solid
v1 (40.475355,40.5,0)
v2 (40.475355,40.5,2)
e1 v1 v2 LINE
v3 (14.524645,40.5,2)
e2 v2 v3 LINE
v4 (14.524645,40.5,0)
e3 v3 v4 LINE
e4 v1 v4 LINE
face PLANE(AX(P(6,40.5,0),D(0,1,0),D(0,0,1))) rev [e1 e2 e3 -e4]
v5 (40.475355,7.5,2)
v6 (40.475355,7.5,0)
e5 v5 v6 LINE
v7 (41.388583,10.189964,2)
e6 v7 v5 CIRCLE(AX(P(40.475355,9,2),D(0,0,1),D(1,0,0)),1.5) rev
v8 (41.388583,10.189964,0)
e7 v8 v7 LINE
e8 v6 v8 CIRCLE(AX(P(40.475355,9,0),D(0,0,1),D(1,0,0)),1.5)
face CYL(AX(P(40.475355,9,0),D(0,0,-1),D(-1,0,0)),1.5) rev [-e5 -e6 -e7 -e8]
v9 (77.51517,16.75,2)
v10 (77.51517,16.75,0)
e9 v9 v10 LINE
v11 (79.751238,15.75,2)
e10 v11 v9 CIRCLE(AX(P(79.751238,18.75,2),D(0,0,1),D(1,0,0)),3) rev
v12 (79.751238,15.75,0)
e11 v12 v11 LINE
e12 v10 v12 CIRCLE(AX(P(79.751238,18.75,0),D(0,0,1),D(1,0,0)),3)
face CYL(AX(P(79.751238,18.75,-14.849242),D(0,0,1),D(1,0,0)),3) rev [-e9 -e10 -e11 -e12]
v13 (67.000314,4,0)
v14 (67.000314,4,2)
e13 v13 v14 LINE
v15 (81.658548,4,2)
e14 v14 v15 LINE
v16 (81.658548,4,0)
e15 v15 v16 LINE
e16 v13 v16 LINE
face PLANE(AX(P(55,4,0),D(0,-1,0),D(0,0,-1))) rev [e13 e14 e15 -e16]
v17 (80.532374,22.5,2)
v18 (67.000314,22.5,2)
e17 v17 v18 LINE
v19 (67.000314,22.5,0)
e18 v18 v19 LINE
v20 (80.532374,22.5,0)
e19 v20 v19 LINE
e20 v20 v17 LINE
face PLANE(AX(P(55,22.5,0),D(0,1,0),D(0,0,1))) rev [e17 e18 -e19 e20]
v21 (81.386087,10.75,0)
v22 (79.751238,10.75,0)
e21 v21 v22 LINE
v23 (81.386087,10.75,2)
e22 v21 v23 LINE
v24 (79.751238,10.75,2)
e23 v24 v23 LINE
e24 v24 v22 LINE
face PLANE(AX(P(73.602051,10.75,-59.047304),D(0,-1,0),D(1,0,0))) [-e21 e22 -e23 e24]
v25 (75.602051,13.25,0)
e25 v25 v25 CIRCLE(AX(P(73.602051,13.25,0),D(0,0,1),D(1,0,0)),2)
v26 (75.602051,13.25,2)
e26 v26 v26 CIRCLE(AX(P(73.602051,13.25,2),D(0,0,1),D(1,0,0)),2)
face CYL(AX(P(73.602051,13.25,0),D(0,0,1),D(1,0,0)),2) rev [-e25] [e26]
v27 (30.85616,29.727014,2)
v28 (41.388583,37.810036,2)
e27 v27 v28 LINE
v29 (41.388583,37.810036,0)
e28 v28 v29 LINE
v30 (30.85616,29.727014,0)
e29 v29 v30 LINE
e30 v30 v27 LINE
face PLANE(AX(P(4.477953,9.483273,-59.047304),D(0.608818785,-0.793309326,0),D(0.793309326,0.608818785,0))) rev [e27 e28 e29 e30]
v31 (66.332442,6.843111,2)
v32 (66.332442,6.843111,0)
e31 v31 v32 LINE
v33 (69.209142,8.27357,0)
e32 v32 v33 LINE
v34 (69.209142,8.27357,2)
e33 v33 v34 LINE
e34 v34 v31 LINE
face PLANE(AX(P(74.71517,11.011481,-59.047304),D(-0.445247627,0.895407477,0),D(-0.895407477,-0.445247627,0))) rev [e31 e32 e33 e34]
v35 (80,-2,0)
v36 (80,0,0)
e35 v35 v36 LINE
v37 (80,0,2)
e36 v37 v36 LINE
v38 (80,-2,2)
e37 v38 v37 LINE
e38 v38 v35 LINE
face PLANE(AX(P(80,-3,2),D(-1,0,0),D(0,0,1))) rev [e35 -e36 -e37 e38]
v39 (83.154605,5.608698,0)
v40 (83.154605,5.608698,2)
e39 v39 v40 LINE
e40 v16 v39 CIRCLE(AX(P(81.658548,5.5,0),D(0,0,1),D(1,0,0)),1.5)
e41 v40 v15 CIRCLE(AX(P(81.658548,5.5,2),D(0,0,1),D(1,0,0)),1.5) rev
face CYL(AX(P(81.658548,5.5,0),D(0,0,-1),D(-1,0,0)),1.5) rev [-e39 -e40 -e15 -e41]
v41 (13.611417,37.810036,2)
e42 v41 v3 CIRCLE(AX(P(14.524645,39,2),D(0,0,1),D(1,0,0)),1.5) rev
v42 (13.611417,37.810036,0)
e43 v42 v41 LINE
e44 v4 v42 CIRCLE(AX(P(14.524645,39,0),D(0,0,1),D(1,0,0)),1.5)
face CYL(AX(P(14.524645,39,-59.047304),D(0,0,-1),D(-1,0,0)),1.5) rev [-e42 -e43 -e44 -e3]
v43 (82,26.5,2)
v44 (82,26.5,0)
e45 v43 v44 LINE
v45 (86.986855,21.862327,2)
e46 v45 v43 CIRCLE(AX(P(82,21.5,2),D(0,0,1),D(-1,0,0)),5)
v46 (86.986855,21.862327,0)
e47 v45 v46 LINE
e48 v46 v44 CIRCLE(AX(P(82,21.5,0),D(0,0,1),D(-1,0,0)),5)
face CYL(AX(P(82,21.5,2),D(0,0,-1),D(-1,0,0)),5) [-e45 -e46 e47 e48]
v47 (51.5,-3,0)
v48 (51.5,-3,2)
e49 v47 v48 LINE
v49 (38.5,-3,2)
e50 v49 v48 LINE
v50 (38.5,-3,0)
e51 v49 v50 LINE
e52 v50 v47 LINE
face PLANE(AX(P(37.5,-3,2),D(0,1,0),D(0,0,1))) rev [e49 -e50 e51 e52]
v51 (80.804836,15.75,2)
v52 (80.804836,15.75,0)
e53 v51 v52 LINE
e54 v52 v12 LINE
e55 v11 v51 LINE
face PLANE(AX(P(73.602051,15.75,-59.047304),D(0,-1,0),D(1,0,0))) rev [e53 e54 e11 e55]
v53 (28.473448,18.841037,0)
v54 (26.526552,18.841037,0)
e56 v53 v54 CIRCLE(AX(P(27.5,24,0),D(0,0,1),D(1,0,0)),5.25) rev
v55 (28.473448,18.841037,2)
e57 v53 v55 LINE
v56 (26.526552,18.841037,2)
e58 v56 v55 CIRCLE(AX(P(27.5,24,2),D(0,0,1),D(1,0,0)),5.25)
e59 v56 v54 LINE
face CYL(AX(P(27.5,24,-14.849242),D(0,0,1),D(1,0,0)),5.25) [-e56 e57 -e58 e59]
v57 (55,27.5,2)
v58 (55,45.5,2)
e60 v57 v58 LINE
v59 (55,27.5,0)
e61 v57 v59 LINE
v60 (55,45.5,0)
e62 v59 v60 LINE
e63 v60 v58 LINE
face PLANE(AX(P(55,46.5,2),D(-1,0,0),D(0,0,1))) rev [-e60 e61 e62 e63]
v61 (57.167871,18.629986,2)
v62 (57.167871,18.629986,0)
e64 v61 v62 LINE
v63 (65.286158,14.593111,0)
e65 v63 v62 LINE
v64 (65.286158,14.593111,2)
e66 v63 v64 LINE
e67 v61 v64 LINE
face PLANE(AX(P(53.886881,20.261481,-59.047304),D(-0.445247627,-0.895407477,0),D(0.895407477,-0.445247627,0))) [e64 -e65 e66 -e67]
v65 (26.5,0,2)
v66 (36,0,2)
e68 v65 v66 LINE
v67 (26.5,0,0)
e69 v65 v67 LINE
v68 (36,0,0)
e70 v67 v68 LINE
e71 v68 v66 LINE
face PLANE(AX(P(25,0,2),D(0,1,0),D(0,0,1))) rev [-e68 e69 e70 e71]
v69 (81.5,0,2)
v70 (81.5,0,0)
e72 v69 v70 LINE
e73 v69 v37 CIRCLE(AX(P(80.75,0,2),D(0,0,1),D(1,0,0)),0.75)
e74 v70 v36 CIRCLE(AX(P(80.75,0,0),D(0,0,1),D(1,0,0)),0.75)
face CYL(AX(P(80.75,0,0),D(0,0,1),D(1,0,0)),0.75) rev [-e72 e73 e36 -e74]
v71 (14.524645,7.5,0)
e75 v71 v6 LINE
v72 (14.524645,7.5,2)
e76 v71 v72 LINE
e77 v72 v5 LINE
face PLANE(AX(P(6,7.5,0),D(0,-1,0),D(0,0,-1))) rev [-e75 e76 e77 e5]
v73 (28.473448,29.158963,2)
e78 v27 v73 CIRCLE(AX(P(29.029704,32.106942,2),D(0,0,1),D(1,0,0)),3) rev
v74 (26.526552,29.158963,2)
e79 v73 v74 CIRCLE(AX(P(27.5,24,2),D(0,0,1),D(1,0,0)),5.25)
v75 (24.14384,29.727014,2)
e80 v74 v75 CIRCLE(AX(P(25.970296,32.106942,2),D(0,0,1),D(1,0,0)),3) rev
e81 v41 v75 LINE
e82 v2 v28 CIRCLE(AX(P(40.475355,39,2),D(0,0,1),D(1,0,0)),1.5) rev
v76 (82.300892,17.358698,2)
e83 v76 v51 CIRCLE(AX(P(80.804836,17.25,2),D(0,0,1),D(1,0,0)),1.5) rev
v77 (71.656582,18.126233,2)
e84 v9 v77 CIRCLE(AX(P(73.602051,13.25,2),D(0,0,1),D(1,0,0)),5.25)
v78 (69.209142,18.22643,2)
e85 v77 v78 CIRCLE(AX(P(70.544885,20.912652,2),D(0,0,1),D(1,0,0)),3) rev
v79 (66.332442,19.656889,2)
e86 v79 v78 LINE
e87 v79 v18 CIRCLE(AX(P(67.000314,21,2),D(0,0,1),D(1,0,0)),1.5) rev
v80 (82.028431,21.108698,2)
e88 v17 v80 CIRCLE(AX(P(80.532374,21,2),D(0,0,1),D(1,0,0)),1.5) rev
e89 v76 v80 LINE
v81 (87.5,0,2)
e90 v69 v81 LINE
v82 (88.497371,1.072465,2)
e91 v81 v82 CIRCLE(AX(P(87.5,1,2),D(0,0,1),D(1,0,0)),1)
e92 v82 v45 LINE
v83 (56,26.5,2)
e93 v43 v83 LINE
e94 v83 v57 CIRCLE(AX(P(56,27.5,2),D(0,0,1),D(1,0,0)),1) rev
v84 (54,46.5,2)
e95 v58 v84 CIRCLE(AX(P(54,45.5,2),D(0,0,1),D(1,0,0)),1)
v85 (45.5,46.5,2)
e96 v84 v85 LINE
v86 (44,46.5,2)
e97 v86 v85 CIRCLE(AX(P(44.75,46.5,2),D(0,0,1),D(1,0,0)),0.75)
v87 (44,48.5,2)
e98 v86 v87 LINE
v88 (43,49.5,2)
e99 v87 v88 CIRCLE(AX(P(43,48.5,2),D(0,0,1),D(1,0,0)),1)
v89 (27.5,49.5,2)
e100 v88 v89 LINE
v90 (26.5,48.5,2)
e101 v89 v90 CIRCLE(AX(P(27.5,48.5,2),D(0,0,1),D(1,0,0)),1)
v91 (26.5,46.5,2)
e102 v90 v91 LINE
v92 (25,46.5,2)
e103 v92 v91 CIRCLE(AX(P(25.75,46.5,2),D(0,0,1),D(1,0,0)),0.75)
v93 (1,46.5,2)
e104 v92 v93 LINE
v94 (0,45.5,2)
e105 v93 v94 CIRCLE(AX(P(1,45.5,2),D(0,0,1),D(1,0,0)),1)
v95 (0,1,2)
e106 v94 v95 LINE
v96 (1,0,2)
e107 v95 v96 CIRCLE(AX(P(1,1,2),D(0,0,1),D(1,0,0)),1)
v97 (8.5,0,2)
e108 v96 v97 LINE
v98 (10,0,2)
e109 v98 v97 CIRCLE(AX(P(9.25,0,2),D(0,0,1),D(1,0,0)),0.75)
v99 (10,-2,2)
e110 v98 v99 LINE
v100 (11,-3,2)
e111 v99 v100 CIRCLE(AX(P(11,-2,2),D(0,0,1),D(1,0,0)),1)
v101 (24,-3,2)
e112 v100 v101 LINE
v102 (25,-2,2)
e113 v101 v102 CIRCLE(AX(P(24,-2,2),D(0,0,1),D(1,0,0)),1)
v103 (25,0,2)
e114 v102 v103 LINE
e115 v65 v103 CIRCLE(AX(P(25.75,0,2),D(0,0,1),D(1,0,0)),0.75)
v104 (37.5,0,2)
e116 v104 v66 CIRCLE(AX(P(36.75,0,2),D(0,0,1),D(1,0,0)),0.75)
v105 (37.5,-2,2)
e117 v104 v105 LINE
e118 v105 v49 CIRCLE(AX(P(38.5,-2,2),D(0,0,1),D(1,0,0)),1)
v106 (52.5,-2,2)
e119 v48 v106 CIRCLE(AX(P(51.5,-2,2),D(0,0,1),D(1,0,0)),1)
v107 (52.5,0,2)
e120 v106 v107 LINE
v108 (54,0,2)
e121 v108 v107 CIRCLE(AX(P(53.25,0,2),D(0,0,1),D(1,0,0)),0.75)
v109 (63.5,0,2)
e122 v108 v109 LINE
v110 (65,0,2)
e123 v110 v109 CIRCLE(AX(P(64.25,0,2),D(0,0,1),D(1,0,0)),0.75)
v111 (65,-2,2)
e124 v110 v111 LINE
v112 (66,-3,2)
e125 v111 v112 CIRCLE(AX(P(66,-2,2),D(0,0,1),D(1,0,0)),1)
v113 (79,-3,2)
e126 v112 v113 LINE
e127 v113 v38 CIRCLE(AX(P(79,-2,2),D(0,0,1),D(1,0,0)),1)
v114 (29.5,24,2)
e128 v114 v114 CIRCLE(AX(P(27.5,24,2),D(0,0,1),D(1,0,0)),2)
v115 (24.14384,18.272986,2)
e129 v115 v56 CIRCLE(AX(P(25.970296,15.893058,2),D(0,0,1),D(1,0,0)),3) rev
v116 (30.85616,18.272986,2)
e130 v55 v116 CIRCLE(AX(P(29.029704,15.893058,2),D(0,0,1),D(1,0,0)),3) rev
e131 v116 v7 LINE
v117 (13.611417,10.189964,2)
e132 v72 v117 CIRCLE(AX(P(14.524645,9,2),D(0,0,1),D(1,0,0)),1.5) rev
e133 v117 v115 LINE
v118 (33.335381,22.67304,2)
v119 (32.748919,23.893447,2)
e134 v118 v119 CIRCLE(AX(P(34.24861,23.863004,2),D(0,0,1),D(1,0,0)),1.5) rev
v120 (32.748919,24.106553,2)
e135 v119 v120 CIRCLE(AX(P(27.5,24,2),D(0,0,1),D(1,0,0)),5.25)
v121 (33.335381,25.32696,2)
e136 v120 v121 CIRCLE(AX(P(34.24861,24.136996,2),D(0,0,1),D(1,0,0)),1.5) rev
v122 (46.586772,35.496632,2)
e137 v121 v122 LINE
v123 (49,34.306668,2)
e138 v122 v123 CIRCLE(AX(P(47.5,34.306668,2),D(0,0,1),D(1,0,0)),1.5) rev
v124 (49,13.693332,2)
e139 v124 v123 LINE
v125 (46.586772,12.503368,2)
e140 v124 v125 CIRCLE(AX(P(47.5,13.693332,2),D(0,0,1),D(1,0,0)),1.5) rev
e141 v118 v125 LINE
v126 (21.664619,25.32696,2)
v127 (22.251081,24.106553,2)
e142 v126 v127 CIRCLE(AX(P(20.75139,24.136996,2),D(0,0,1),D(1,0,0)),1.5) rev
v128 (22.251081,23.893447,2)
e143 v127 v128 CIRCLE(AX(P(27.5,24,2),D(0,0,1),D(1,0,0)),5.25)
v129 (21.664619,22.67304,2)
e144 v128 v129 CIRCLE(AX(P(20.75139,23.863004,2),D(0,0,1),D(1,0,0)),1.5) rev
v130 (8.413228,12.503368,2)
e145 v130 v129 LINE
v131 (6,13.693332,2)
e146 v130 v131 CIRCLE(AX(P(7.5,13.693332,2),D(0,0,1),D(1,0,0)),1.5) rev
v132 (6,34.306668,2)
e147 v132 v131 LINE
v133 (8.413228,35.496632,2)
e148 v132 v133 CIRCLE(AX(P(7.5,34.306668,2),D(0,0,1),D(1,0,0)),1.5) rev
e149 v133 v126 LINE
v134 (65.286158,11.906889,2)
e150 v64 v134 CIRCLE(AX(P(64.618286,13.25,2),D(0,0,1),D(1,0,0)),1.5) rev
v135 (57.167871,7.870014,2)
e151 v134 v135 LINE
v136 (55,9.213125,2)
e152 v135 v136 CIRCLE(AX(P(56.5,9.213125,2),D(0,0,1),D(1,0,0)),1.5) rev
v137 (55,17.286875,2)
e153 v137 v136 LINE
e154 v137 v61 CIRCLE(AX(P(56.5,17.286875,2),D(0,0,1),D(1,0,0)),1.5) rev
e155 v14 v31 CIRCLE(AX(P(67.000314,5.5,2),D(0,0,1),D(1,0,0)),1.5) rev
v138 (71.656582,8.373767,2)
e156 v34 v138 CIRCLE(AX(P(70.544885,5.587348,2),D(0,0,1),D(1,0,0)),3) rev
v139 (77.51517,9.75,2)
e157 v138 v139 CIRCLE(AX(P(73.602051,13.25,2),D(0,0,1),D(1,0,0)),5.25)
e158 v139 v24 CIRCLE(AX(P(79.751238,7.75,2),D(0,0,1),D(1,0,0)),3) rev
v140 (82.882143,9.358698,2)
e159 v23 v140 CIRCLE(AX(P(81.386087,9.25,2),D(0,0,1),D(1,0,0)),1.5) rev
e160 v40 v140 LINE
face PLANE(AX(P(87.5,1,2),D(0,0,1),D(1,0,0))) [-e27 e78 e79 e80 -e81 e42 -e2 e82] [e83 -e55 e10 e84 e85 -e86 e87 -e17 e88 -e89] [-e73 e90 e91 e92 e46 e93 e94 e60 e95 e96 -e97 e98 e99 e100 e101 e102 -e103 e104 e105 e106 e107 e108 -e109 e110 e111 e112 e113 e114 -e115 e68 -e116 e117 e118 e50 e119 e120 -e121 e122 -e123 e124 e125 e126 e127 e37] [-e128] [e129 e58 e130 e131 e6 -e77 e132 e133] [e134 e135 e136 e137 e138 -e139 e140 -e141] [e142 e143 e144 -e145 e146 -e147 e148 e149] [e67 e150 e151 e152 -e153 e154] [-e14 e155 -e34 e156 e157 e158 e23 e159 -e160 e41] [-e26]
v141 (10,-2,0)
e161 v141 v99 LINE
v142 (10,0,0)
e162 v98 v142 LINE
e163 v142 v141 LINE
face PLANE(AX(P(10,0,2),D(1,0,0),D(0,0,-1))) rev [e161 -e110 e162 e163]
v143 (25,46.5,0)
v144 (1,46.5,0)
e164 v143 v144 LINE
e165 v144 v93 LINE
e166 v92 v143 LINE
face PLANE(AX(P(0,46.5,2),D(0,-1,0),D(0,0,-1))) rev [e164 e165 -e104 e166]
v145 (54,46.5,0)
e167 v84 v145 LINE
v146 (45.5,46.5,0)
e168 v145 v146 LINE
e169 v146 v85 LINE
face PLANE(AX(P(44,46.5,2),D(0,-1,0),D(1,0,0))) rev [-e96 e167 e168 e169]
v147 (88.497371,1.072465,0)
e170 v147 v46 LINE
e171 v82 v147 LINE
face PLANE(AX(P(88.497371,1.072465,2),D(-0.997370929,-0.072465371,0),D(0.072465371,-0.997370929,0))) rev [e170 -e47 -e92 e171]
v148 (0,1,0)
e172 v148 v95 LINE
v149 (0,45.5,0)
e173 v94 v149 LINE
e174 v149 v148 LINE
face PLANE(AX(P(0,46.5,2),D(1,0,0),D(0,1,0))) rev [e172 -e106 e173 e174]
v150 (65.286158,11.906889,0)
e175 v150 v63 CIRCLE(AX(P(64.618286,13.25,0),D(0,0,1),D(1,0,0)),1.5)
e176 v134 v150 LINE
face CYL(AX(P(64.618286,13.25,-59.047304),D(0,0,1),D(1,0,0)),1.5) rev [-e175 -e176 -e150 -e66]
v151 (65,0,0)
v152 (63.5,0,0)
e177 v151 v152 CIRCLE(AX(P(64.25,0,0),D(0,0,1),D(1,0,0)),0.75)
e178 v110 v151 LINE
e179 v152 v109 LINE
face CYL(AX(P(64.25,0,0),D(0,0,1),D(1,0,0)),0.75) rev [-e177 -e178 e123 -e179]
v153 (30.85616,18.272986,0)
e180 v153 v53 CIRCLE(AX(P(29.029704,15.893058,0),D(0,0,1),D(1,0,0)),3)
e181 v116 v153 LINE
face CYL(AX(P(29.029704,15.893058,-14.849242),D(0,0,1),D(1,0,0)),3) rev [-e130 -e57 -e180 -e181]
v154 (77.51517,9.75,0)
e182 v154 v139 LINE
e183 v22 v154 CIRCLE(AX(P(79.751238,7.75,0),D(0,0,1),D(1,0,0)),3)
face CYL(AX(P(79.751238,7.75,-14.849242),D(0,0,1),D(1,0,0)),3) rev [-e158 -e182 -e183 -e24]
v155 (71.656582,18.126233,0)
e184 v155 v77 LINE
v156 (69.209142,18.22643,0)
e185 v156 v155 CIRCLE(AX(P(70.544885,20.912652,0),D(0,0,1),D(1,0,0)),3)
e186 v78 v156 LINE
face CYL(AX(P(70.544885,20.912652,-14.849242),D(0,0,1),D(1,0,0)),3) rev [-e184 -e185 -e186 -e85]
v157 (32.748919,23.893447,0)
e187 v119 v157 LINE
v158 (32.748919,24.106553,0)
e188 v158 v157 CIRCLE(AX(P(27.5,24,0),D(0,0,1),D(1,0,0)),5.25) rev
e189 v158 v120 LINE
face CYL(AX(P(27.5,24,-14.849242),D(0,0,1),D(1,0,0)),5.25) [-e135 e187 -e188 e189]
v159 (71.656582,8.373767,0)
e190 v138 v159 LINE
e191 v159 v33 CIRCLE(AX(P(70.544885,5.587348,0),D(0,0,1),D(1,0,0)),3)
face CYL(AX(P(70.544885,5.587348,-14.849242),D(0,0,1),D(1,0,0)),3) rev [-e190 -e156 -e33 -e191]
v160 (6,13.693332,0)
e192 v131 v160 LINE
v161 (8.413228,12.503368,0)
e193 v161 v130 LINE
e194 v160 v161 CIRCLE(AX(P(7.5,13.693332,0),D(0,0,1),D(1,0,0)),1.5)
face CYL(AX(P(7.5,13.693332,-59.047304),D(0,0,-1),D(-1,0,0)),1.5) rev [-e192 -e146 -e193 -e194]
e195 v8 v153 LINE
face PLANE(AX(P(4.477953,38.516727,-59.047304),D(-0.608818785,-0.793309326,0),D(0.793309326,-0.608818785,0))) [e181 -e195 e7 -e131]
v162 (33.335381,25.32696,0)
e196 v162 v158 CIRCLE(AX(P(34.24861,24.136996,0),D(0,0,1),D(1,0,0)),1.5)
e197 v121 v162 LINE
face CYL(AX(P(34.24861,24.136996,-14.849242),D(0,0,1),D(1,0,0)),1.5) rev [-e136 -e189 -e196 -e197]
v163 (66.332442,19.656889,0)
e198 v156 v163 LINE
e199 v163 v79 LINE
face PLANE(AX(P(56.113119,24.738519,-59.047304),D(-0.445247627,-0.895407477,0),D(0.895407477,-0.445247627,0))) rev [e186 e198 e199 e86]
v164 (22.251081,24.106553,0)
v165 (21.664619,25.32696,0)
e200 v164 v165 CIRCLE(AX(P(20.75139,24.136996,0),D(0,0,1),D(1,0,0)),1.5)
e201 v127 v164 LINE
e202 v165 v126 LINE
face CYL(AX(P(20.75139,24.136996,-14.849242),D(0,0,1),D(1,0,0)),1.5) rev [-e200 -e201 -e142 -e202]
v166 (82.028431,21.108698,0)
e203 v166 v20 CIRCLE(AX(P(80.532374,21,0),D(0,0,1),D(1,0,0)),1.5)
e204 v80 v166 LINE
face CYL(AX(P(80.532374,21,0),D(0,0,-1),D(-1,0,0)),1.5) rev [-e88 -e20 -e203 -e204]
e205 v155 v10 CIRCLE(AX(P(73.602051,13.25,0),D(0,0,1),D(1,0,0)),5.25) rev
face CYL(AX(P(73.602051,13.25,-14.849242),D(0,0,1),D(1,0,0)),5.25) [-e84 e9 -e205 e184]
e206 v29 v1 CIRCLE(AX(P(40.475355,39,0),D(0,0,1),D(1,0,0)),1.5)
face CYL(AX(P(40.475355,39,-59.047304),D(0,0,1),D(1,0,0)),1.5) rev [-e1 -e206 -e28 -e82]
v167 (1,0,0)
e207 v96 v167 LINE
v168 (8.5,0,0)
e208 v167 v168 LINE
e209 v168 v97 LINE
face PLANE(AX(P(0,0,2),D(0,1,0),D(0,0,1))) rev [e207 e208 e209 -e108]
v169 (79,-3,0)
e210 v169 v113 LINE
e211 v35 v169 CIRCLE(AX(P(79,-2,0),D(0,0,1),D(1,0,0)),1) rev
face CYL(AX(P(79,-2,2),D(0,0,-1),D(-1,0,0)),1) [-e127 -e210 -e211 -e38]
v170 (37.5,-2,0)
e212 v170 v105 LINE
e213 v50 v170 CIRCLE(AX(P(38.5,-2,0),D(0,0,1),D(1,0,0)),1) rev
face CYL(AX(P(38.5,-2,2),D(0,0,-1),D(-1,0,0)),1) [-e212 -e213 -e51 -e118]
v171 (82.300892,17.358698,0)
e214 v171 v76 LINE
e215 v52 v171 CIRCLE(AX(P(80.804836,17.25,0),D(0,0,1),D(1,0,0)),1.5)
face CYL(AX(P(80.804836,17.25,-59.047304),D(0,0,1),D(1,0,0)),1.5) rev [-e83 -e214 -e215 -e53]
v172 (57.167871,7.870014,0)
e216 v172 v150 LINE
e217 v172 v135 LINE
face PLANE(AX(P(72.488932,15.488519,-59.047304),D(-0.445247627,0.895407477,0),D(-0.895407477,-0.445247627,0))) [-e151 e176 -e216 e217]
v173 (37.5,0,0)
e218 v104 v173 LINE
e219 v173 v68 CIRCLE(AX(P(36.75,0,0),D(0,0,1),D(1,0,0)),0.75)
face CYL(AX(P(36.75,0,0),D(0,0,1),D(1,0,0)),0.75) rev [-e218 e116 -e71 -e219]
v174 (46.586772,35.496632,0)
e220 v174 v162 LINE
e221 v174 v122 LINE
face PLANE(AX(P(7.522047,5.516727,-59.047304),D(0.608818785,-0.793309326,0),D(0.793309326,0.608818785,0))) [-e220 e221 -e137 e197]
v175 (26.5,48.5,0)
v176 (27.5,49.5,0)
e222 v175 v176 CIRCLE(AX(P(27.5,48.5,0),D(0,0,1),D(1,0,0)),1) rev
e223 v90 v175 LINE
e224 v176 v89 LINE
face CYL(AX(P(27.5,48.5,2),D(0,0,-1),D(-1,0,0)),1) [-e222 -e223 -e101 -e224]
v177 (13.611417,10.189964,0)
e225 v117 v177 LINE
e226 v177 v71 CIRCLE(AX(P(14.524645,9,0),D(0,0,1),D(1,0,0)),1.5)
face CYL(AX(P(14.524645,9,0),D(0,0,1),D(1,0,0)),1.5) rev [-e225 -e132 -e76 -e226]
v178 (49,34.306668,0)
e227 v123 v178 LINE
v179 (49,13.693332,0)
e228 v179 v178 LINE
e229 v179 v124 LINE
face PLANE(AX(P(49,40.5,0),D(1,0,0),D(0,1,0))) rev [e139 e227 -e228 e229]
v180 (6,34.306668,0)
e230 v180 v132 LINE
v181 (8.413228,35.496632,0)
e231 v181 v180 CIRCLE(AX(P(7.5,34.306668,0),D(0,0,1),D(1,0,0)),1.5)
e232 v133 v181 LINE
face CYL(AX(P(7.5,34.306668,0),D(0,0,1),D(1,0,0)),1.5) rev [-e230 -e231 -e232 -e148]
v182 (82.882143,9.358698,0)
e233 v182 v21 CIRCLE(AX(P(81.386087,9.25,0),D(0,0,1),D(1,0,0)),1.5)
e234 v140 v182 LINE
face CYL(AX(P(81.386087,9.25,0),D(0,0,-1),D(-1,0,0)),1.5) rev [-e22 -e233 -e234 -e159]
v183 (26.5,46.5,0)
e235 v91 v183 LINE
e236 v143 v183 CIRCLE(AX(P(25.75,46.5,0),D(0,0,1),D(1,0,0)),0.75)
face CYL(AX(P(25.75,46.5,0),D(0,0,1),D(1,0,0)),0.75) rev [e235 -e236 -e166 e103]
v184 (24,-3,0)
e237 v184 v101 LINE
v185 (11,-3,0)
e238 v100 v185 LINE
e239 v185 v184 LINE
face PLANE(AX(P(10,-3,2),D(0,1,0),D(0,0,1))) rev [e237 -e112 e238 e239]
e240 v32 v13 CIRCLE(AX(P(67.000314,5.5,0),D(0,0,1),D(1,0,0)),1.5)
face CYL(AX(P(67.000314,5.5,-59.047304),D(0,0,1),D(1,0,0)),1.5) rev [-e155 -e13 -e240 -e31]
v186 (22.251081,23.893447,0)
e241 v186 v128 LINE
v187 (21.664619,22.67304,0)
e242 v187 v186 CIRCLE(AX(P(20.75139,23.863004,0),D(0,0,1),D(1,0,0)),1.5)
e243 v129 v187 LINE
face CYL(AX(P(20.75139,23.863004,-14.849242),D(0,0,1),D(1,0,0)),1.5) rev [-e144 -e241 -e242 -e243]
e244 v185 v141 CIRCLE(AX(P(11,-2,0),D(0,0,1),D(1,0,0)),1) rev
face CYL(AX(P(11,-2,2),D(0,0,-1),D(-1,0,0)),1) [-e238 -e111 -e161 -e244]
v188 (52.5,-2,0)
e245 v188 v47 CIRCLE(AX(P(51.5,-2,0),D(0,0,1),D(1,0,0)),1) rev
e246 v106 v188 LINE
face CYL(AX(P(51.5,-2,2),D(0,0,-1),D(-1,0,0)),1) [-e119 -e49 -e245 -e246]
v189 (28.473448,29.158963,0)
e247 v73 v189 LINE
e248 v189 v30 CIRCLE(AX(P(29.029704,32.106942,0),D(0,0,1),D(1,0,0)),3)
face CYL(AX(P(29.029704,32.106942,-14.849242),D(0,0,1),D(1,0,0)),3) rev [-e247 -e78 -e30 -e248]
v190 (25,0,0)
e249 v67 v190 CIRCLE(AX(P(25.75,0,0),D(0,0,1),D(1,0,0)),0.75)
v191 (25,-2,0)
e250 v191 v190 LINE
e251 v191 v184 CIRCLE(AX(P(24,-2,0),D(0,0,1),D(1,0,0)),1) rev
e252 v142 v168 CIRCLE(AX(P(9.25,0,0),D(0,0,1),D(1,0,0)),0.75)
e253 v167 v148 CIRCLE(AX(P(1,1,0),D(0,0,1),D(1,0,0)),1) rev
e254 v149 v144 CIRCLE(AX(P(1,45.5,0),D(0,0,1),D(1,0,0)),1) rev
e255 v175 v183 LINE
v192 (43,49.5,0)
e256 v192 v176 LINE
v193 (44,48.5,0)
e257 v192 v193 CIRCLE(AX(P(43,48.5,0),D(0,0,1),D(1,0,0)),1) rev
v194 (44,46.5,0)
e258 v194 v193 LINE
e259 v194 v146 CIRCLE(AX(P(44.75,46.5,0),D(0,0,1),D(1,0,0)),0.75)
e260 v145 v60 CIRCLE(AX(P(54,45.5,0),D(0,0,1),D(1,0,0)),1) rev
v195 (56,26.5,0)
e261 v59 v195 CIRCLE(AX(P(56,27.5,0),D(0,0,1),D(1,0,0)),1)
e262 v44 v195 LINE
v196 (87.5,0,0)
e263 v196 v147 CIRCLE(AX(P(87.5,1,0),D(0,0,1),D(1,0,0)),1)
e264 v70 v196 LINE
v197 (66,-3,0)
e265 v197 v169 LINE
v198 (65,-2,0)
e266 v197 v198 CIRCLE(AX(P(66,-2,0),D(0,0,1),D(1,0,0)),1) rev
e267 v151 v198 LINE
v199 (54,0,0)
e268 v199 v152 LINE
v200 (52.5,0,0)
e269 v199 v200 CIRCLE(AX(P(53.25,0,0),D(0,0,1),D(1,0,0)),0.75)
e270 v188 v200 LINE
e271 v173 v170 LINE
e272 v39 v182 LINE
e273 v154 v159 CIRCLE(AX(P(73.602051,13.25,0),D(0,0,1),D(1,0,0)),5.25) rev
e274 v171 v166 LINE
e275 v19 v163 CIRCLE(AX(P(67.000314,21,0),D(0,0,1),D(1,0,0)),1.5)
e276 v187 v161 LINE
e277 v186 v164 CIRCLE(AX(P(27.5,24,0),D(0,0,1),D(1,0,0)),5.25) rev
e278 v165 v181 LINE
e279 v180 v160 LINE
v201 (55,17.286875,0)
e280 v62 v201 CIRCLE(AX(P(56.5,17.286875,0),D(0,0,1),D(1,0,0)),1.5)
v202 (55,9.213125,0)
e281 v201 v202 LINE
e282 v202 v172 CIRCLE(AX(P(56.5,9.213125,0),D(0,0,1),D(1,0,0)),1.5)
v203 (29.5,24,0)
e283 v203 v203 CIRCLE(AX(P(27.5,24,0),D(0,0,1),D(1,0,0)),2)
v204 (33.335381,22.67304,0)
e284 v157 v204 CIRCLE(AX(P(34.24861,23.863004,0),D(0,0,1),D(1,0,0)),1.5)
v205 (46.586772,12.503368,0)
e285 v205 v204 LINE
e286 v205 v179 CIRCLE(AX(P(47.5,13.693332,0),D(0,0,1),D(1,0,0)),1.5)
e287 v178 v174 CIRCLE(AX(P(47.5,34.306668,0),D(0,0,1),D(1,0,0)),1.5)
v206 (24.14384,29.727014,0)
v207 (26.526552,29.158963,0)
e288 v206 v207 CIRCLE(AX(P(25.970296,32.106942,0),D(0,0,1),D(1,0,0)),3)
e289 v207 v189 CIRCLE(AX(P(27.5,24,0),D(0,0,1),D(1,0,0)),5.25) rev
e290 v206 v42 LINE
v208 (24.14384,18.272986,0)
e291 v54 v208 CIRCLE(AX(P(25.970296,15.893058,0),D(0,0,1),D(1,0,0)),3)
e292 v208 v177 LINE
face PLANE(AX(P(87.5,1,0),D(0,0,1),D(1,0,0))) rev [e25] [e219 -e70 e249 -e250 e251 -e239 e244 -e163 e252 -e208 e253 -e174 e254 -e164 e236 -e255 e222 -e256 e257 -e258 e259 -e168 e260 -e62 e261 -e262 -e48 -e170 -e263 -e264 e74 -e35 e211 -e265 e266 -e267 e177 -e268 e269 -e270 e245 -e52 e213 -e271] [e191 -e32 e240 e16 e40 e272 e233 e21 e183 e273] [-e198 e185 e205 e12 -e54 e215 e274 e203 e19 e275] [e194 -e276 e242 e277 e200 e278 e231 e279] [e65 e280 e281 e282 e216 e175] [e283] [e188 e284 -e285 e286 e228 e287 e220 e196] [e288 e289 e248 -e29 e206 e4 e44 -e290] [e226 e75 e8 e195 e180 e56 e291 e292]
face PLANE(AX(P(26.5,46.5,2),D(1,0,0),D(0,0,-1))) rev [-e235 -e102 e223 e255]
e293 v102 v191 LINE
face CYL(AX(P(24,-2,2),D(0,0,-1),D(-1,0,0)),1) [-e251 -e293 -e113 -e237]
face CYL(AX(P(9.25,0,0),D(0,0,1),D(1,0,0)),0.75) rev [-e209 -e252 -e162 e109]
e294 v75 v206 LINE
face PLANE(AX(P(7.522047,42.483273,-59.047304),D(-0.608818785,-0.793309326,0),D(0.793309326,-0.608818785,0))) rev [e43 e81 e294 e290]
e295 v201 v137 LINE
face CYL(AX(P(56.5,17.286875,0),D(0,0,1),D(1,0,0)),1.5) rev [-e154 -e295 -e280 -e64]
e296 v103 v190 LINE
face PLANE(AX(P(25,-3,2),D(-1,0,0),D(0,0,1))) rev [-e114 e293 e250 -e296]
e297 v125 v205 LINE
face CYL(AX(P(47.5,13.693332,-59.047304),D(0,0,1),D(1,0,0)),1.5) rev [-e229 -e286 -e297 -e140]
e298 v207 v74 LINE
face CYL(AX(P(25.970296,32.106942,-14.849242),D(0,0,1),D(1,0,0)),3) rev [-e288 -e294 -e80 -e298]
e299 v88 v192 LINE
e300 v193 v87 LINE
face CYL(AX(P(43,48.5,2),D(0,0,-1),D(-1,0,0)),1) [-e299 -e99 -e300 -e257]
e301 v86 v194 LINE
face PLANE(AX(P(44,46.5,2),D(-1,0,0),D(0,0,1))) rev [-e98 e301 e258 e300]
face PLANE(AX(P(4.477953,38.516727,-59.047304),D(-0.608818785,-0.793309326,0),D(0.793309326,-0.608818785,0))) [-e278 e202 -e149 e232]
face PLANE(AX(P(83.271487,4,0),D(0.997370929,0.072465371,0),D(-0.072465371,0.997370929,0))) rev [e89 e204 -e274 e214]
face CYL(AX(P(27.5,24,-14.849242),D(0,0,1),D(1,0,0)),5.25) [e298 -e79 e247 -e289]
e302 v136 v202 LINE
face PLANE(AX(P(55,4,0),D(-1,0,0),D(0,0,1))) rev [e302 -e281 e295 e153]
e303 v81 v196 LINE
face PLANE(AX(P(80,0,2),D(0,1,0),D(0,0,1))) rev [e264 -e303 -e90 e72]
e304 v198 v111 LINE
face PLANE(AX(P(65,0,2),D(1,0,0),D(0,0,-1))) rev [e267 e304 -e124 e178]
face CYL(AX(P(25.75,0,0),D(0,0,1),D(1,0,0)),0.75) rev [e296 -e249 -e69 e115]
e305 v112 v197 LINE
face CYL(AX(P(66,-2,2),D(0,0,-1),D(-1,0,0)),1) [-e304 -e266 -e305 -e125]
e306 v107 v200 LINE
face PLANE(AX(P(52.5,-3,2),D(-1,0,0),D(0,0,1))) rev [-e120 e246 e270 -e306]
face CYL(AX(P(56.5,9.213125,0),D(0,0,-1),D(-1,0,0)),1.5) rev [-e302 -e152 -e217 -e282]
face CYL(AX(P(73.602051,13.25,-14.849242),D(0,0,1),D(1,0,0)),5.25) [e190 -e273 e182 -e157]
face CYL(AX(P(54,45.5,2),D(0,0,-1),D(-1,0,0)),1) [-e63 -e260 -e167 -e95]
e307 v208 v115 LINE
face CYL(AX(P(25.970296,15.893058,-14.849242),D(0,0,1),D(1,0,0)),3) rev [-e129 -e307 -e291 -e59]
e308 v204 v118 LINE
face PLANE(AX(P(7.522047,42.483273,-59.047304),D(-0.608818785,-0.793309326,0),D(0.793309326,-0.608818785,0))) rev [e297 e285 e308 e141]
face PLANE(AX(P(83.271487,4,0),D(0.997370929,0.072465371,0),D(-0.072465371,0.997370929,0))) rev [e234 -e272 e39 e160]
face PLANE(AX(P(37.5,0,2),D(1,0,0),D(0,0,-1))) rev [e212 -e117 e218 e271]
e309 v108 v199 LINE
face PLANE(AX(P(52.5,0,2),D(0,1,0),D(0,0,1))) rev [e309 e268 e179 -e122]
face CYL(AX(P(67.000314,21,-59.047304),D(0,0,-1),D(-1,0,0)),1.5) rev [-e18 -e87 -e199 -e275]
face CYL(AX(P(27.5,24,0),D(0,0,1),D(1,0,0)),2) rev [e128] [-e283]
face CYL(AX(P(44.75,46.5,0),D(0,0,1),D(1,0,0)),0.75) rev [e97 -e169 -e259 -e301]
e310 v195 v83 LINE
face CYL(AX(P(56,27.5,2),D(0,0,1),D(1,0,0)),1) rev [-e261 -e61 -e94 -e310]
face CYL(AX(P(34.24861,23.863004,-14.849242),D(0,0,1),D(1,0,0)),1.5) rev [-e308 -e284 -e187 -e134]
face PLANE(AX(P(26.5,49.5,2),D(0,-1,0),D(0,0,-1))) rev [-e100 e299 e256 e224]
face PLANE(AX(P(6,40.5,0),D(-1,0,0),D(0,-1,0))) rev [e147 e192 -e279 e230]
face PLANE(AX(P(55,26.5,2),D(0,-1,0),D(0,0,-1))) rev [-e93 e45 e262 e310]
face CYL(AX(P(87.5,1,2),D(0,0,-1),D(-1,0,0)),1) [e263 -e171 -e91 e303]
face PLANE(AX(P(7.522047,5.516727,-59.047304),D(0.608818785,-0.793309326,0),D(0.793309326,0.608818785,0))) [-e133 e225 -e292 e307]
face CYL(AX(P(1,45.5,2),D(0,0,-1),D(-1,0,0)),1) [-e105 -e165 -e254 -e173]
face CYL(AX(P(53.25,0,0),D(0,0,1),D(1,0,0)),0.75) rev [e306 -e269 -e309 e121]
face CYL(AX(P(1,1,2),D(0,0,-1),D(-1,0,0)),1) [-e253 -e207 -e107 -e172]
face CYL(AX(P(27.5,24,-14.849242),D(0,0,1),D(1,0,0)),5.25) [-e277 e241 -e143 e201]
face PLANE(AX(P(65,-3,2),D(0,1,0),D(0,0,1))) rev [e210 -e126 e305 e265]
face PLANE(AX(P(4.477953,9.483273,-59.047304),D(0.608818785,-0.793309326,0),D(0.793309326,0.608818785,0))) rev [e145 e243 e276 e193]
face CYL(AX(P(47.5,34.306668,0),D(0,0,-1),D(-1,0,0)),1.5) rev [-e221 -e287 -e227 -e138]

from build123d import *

# Parameters (mm, degrees)
EXTRUDE_1_DEPTH     = 2
SKETCH_2_R          = 0.75
SKETCH_2_W          = 43
SKETCH_2_H          = 33
CUT_EXTRUDE_1_DEPTH = 102.422384117
EXTRUDE_START       = -2
EXTRUDE_1_2_DEPTH   = 2
FILLET_1_R          = 1
SKETCH_4_R          = 2
CUT_EXTRUDE_2_DEPTH = 102.422384117
FILLET_2_R          = 3
FILLET_3_R          = 1.5


# Read off the part's stored shape, not the designer's step: 拉伸-薄壁1
with BuildPart() as part:
    # 草图1 → Extrude 1 (new body)
    with BuildSketch(Plane.XY):
        with BuildLine():
            Line((88.497370929, 1.072465371), (86.986854645, 21.862326856))
            ThreePointArc((86.986854645, 21.862326856), (85.405023181, 25.161395518), (82, 26.5))
            Line((82, 26.5), (55, 26.5))
            Line((55, 26.5), (55, 46.5))
            Line((55, 46.5), (44, 46.5))
            Line((44, 46.5), (44, 49.5))
            Line((44, 49.5), (26.5, 49.5))
            Line((26.5, 49.5), (26.5, 46.5))
            Line((26.5, 46.5), (0, 46.5))
            Line((0, 46.5), (0, 0))
            Line((0, 0), (10, 0))
            Line((10, 0), (10, -3))
            Line((10, -3), (25, -3))
            Line((25, -3), (25, 0))
            Line((25, 0), (37.5, 0))
            Line((37.5, 0), (37.5, -3))
            Line((37.5, -3), (52.5, -3))
            Line((52.5, -3), (52.5, 0))
            Line((52.5, 0), (65, 0))
            Line((65, 0), (65, -3))
            Line((65, -3), (80, -3))
            Line((80, -3), (80, 0))
            Line((80, 0), (87.5, 0))
            ThreePointArc((87.5, 0), (88.232279104, 0.318995364), (88.497370929, 1.072465371))
        make_face()
    extrude(amount=EXTRUDE_1_DEPTH)

    # 草图2 → 切除-拉伸1 (cut, through all)
    with BuildSketch(Plane.XY.offset(2)):
        with Locations((9.25, 0)):
            Circle(SKETCH_2_R)
        with Locations((25.75, 0)):
            Circle(SKETCH_2_R)
        with Locations((36.75, 0)):
            Circle(SKETCH_2_R)
        with Locations((53.25, 0)):
            Circle(SKETCH_2_R)
        with Locations((64.25, 0)):
            Circle(SKETCH_2_R)
        with Locations((80.75, 0)):
            Circle(SKETCH_2_R)
        with Locations((25.75, 46.5)):
            Circle(SKETCH_2_R)
        with Locations((44.75, 46.5)):
            Circle(SKETCH_2_R)
        with Locations((27.5, 24)):
            Rectangle(SKETCH_2_W, SKETCH_2_H)
        Polygon((55, 4), (83.271486825, 4), (81.92734361, 22.5), (55, 22.5), align=None)
    extrude(amount=-CUT_EXTRUDE_1_DEPTH, mode=Mode.SUBTRACT)

    # Extrude 1 2 outline → Extrude 1 2 (add)
    with BuildSketch(Plane.XY.offset(2).offset(EXTRUDE_START)):
        with BuildLine():
            Line((55, 19.707975069), (67.987198163, 13.25))
            Line((67.987198163, 13.25), (55, 6.792024931))
            Line((55, 6.792024931), (55, 4))
            Line((55, 4), (60.614853056, 4))
            Line((60.614853056, 4), (70.581480185, 8.955975008))
            ThreePointArc((70.581480185, 8.955975008), (74.80264095, 8.139120986), (78.218597547, 10.75))
            Line((78.218597547, 10.75), (82.781056192, 10.75))
            Line((82.781056192, 10.75), (82.417774242, 15.75))
            Line((82.417774242, 15.75), (78.218597547, 15.75))
            ThreePointArc((78.218597547, 15.75), (74.80264095, 18.360879014), (70.581480185, 17.544024992))
            Line((70.581480185, 17.544024992), (60.614853056, 22.5))
            Line((60.614853056, 22.5), (55, 22.5))
            Line((55, 22.5), (55, 19.707975069))
        make_face()
        with BuildLine():
            Line((22.315603781, 23.172633188), (6, 10.651355868))
            Line((6, 10.651355868), (6, 7.5))
            Line((6, 7.5), (10.106312192, 7.5))
            Line((10.106312192, 7.5), (25.359697706, 19.206086558))
            ThreePointArc((25.359697706, 19.206086558), (27.5, 18.75), (29.640302294, 19.206086558))
            Line((29.640302294, 19.206086558), (44.893687808, 7.5))
            Line((44.893687808, 7.5), (49, 7.5))
            Line((49, 7.5), (49, 10.651355868))
            Line((49, 10.651355868), (32.684396219, 23.172633188))
            ThreePointArc((32.684396219, 23.172633188), (32.75, 24), (32.684396219, 24.827366812))
            Line((32.684396219, 24.827366812), (49, 37.348644132))
            Line((49, 37.348644132), (49, 40.5))
            Line((49, 40.5), (44.893687808, 40.5))
            Line((44.893687808, 40.5), (29.640302294, 28.793913442))
            ThreePointArc((29.640302294, 28.793913442), (27.5, 29.25), (25.359697706, 28.793913442))
            Line((25.359697706, 28.793913442), (10.106312192, 40.5))
            Line((10.106312192, 40.5), (6, 40.5))
            Line((6, 40.5), (6, 37.348644132))
            Line((6, 37.348644132), (22.315603781, 24.827366812))
            ThreePointArc((22.315603781, 24.827366812), (22.25, 24), (22.315603781, 23.172633188))
        make_face()
    extrude(amount=EXTRUDE_1_2_DEPTH)

    # 圆角1
    fillet_1_edges = [part.edges().sort_by_distance(p)[0] for p in [
        (52.5, -3, 1),
        (37.5, -3, 1),
        (25, -3, 1),
        (10, -3, 1),
        (0, 0, 1),
        (0, 46.5, 1),
        (26.5, 49.5, 1),
        (44, 49.5, 1),
        (55, 46.5, 1),
        (55, 26.5, 1),
        (80, -3, 1),
        (65, -3, 1),
    ]]
    fillet(fillet_1_edges, radius=FILLET_1_R)

    # 草图4 → 切除-拉伸2 (cut, through all)
    with BuildSketch(Plane.XY.offset(2)):
        with Locations((27.5, 24)):
            Circle(SKETCH_4_R)
        with Locations((73.602051219, 13.25)):
            Circle(SKETCH_4_R)
    extrude(amount=-CUT_EXTRUDE_2_DEPTH, mode=Mode.SUBTRACT)

    # 圆角2
    fillet_2_edges = [part.edges().sort_by_distance(p)[0] for p in [
        (70.581480185, 17.544024992, 1),
        (78.218597547, 15.75, 1),
        (70.581480185, 8.955975008, 1),
        (78.218597547, 10.75, 1),
        (29.640302294, 28.793913442, 1),
        (25.359697706, 28.793913442, 1),
        (29.640302294, 19.206086558, 1),
        (25.359697706, 19.206086558, 1),
    ]]
    fillet(fillet_2_edges, radius=FILLET_2_R)

    # 圆角3
    fillet_3_edges = [part.edges().sort_by_distance(p)[0] for p in [
        (81.92734361, 22.5, 1),
        (83.271486825, 4, 1),
        (60.614853056, 4, 1),
        (82.417774242, 15.75, 1),
        (82.781056192, 10.75, 1),
        (60.614853056, 22.5, 1),
        (55, 19.707975069, 1),
        (55, 6.792024931, 1),
        (67.987198163, 13.25, 1),
        (10.106312192, 7.5, 1),
        (44.893687808, 7.5, 1),
        (49, 37.348644132, 1),
        (49, 10.651355868, 1),
        (10.106312192, 40.5, 1),
        (44.893687808, 40.5, 1),
        (6, 37.348644132, 1),
        (6, 10.651355868, 1),
        (22.315603781, 23.172633188, 1),
        (32.684396219, 23.172633188, 1),
        (32.684396219, 24.827366812, 1),
        (22.315603781, 24.827366812, 1),
    ]]
    fillet(fillet_3_edges, radius=FILLET_3_R)


solid = part.part
